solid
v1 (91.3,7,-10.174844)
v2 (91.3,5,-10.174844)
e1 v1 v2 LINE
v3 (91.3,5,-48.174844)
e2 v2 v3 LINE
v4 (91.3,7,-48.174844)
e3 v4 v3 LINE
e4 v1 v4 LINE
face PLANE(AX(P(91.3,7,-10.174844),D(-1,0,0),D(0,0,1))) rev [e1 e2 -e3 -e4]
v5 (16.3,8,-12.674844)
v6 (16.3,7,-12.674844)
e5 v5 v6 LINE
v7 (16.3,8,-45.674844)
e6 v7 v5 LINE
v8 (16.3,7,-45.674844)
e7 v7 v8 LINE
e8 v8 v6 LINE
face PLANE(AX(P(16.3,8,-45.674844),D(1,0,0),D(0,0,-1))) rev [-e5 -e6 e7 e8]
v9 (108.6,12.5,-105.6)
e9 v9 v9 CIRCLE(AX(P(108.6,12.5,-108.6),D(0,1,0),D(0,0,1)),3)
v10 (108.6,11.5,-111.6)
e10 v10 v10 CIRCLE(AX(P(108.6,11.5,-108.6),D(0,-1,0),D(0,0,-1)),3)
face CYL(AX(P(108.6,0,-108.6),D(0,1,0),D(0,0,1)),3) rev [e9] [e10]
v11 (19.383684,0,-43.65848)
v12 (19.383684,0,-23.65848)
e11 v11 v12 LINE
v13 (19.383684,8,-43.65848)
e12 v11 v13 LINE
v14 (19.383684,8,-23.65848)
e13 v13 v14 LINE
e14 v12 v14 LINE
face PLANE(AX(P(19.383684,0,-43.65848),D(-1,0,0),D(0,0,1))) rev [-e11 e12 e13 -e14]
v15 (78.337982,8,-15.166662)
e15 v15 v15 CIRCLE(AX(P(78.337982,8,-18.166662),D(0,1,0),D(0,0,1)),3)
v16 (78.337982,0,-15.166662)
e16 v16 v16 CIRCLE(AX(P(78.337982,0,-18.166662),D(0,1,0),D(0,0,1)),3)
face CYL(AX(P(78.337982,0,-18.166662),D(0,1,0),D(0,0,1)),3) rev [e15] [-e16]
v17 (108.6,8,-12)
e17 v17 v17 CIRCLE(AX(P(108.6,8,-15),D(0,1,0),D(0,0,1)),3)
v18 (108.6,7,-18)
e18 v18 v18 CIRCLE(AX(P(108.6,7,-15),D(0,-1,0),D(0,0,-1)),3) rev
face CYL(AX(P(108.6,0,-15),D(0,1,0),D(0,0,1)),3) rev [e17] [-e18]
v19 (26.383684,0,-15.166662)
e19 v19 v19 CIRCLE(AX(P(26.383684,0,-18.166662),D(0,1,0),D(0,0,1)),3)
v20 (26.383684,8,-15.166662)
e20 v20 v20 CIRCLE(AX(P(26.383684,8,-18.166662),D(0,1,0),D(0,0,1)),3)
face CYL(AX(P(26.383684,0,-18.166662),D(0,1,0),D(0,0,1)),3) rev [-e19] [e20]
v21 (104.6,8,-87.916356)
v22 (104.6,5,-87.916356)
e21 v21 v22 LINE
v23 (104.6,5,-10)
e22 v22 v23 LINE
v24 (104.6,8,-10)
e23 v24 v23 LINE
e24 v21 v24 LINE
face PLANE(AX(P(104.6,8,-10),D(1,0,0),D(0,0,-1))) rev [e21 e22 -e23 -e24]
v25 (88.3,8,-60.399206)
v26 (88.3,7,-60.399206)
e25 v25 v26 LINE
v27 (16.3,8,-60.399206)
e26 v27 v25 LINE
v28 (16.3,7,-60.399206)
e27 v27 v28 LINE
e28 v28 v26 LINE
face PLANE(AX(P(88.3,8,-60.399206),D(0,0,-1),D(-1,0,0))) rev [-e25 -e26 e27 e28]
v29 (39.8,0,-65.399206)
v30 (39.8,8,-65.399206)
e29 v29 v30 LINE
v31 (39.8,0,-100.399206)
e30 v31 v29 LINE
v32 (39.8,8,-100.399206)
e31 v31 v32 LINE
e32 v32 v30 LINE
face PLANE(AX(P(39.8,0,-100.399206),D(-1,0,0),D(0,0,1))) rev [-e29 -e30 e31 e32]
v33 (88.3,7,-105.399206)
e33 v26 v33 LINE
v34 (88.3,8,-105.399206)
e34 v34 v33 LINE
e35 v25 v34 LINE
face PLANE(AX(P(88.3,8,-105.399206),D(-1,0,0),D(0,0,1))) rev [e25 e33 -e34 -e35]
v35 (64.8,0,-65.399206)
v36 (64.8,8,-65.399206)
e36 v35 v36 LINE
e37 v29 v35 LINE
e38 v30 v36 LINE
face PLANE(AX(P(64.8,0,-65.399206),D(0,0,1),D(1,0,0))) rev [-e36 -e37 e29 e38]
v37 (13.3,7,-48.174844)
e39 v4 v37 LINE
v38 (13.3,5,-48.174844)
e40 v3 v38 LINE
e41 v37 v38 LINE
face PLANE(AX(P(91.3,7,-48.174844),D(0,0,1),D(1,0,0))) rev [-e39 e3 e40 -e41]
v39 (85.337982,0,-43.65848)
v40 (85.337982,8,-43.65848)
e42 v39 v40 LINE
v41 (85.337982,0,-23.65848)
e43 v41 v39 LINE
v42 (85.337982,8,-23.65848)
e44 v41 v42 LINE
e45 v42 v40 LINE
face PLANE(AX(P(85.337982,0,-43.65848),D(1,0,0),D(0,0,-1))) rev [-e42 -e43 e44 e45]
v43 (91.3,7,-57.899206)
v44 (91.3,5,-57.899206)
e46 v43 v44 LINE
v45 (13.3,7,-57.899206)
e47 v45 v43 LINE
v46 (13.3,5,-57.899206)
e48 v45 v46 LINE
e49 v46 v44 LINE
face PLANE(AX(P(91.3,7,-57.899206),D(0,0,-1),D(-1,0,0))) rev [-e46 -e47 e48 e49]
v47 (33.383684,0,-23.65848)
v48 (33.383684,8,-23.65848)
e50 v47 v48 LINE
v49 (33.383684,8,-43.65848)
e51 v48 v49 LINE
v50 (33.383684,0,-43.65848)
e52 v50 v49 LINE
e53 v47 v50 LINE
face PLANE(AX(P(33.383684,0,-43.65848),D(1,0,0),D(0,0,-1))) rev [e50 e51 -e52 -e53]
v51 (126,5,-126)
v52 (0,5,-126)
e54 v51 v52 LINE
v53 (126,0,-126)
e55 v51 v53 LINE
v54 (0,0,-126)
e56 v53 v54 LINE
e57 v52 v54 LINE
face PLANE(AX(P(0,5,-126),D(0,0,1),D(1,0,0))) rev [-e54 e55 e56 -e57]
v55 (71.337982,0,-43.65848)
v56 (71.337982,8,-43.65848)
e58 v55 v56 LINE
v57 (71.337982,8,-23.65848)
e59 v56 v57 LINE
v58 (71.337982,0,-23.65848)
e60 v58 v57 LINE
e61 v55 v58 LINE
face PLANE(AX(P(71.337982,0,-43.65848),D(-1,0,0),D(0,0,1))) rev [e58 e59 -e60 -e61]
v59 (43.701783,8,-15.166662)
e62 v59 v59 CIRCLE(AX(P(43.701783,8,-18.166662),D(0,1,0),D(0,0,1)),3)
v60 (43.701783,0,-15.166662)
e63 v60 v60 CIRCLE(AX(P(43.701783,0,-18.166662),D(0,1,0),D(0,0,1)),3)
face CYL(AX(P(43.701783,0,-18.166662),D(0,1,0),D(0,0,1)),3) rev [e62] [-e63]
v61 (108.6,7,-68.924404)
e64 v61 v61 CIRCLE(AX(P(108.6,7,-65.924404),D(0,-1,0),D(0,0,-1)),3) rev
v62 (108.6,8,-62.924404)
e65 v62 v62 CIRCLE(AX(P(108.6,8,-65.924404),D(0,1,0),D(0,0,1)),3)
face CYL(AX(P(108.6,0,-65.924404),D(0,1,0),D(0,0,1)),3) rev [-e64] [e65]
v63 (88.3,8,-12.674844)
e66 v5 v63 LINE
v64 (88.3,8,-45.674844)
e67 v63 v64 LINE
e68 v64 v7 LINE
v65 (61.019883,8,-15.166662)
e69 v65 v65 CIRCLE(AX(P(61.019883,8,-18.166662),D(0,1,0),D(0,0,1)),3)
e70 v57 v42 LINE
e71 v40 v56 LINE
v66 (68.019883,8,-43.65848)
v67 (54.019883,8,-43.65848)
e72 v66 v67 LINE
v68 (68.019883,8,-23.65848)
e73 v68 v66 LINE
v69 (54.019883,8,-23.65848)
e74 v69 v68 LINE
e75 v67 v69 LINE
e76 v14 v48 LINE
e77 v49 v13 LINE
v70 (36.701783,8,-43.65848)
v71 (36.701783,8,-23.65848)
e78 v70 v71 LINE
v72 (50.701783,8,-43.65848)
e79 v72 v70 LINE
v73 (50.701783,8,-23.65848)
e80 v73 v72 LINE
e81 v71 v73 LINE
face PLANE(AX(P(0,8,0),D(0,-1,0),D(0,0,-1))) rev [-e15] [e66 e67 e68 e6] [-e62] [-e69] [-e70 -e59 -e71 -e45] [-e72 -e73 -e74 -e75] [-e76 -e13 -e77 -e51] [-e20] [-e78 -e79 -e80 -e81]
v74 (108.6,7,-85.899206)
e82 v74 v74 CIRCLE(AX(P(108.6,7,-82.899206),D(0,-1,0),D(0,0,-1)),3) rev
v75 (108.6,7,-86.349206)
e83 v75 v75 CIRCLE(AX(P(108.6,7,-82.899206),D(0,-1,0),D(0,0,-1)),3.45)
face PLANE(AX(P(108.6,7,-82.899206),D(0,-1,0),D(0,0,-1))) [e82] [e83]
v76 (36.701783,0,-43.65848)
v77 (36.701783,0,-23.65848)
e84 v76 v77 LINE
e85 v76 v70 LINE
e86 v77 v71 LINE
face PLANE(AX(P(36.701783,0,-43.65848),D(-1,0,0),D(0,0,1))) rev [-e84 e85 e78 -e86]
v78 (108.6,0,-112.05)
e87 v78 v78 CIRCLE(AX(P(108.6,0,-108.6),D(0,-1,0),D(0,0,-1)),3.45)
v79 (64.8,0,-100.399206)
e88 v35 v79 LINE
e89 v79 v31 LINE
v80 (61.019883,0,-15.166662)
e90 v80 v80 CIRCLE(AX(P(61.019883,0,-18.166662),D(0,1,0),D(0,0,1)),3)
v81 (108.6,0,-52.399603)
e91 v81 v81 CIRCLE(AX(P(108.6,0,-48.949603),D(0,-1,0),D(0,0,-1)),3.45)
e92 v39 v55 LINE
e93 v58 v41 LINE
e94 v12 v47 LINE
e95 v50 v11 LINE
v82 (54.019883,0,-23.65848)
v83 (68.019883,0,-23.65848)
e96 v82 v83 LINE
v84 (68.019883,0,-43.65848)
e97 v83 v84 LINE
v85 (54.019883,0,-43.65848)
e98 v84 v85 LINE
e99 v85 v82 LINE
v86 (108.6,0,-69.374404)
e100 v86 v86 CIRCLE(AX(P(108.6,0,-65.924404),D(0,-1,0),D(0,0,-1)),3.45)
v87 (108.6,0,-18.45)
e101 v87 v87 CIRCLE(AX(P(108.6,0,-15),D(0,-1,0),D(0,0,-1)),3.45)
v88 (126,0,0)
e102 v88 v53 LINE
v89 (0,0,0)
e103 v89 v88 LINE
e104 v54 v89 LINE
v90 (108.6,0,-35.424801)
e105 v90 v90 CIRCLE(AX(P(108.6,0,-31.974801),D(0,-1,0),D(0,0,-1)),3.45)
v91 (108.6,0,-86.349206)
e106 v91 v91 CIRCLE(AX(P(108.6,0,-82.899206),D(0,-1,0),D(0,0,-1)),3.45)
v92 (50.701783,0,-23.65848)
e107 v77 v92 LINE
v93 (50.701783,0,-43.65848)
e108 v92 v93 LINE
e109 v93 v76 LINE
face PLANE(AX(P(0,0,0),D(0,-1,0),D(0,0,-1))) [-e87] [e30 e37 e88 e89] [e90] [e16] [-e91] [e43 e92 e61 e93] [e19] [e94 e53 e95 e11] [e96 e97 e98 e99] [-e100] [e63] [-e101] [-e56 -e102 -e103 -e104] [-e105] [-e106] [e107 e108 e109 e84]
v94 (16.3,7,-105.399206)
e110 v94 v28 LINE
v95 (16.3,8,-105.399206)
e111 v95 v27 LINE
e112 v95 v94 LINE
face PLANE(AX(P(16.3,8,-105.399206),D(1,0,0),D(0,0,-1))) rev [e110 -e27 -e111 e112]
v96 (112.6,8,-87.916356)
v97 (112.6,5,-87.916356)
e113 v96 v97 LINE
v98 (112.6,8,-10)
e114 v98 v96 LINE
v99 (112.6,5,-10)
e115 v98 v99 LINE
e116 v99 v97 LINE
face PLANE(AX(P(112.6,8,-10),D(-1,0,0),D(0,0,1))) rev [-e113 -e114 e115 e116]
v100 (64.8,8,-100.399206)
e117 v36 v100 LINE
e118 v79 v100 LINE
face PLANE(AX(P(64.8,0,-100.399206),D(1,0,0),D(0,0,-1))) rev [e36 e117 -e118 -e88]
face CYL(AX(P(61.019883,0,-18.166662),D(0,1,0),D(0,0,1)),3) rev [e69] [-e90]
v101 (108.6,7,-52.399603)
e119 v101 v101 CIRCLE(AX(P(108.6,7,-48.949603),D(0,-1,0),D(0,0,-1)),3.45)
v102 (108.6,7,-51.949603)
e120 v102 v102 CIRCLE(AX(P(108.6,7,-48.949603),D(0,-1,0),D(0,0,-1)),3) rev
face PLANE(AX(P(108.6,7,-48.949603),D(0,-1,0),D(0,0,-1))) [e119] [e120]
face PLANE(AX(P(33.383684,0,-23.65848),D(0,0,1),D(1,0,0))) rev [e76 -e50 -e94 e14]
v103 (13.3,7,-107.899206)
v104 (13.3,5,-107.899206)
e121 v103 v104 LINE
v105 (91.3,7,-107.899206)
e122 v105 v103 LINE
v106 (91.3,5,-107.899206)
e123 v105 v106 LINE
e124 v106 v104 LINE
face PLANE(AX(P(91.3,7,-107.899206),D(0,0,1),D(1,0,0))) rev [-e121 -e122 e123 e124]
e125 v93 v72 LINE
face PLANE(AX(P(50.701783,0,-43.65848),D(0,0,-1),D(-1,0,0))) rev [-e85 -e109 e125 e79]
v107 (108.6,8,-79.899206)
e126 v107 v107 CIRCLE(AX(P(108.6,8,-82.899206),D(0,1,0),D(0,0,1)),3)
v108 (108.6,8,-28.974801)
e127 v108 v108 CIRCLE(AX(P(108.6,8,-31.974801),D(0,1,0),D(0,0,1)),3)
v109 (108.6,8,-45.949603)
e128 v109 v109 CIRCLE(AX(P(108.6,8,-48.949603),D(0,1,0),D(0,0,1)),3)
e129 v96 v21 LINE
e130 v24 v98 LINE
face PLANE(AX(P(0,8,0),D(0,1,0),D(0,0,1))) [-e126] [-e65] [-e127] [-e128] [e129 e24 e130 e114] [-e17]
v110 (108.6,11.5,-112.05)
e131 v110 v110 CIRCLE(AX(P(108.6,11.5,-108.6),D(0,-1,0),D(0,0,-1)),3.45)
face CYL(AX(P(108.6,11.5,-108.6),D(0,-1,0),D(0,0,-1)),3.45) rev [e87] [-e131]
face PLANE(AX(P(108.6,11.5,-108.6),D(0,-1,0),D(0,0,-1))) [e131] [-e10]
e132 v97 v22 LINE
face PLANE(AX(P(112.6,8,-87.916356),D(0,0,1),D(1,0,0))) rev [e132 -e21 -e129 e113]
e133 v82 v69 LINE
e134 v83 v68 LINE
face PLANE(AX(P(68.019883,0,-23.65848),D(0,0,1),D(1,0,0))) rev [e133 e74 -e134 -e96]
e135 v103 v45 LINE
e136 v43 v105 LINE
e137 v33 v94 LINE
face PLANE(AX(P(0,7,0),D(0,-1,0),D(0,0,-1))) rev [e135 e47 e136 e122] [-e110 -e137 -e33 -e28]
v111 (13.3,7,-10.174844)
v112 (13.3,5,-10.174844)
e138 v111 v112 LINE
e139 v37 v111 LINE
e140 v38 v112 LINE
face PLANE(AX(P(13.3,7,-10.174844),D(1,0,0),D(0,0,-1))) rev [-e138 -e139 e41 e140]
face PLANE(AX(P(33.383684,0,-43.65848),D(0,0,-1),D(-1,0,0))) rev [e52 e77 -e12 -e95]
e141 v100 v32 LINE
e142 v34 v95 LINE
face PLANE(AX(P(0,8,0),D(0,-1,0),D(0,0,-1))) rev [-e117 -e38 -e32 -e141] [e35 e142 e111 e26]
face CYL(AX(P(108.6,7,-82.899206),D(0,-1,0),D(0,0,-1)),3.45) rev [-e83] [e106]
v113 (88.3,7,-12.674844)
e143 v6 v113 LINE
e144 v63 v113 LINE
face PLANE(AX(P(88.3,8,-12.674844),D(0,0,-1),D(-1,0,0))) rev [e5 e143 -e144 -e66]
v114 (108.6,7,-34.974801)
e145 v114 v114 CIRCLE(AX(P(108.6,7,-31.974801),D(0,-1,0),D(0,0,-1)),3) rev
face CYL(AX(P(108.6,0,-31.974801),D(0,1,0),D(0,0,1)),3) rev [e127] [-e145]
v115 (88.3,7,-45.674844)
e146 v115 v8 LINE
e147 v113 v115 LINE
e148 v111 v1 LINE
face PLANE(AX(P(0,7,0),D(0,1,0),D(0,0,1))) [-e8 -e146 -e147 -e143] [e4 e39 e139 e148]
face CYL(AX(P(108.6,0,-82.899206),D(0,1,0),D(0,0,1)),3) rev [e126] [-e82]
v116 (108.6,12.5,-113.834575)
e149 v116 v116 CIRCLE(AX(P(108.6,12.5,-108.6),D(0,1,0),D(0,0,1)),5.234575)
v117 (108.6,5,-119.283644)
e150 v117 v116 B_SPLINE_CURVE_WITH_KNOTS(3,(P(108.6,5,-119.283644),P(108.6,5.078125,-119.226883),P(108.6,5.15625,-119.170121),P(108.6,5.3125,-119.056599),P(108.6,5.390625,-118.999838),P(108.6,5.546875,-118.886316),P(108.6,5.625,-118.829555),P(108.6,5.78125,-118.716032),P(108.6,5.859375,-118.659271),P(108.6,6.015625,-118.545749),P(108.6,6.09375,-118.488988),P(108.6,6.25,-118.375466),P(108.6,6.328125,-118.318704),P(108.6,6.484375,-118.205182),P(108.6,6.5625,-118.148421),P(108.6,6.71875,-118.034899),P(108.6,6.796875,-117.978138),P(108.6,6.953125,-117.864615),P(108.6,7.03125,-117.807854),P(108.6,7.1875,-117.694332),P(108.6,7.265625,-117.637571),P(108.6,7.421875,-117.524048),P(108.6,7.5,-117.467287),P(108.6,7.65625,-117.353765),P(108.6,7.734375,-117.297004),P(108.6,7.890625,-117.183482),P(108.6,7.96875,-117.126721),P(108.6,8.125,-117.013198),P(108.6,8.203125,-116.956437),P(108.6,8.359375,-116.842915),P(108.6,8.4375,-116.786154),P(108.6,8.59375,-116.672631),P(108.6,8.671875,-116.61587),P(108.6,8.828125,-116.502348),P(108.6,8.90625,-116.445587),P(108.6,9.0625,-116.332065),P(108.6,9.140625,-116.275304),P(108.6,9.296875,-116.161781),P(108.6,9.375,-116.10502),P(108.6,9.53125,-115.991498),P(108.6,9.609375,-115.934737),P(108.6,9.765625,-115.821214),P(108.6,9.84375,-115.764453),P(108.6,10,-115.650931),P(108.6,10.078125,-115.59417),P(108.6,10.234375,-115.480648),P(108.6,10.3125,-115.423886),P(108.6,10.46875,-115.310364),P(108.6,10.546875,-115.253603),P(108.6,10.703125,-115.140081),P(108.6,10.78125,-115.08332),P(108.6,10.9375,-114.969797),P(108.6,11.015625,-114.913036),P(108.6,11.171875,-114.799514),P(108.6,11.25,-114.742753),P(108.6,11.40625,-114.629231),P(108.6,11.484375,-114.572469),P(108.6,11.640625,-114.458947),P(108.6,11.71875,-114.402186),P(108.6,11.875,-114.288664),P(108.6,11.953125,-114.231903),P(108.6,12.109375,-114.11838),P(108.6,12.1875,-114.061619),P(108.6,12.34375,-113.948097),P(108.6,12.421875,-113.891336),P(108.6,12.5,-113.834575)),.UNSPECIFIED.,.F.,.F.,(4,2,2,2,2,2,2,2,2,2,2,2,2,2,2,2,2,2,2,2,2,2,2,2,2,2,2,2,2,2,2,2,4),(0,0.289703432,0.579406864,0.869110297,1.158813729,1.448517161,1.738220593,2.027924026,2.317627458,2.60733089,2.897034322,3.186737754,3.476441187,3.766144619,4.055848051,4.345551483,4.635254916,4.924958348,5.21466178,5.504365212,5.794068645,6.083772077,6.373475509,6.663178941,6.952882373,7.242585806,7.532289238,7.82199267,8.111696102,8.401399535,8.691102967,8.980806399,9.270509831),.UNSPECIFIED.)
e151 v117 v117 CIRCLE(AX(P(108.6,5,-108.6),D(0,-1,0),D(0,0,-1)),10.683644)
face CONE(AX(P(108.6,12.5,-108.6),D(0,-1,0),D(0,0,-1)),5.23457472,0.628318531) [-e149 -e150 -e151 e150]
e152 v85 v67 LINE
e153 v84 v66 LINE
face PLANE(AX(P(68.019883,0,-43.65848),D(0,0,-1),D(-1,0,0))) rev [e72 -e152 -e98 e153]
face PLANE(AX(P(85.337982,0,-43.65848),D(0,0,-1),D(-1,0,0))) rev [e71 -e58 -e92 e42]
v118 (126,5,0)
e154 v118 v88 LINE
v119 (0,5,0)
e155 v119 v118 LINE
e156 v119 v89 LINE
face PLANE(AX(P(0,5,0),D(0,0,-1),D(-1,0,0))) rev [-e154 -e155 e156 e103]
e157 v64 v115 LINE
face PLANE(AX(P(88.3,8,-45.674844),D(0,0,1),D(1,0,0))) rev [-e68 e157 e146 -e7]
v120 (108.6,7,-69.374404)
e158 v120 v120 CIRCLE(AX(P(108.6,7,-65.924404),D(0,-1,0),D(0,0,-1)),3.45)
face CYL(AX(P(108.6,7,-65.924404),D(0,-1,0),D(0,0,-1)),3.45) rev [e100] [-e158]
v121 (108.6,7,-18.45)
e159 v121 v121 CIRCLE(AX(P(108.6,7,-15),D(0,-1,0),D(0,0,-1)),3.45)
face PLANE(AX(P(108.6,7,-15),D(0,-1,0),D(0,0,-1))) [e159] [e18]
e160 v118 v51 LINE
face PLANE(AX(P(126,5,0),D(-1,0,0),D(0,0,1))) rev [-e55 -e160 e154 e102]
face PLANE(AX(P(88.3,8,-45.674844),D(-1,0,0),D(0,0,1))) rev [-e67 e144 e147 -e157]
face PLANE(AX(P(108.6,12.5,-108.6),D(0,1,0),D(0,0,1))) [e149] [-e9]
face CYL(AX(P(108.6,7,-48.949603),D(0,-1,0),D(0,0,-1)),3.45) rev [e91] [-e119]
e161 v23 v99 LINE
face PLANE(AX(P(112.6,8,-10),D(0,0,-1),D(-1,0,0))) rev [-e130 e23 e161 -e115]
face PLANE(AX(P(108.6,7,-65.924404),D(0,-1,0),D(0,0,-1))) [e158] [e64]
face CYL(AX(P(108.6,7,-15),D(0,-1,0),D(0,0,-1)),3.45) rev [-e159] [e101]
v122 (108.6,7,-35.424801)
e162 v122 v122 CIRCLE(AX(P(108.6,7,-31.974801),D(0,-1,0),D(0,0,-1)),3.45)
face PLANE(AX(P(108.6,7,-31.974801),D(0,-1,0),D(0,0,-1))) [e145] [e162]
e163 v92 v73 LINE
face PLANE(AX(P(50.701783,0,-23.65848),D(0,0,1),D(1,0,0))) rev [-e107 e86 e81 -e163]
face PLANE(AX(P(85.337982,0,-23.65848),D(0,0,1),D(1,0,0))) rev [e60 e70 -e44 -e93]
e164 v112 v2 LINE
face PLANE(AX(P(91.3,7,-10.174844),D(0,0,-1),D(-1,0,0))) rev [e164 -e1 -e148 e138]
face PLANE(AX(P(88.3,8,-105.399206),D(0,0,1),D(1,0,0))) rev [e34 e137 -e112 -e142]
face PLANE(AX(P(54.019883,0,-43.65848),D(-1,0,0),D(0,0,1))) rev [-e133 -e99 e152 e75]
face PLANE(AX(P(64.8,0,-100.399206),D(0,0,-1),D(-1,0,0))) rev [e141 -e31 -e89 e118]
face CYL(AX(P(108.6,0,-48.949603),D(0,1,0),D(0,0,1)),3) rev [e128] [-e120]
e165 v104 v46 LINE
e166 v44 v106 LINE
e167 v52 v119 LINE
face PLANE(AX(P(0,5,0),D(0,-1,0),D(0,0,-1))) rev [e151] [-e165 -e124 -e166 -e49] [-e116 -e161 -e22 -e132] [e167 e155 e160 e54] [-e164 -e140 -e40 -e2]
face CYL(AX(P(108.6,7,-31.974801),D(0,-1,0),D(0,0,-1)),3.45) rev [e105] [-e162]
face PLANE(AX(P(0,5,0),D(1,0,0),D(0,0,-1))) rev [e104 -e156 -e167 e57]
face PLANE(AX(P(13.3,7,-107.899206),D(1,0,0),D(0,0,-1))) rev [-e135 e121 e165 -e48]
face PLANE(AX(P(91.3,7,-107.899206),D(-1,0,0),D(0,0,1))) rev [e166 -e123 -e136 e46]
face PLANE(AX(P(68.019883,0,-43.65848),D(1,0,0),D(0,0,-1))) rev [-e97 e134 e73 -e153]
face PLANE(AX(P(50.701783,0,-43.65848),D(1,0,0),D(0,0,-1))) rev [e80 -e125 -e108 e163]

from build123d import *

# Parameters (mm, degrees)
SKETCH1_W           = 126
SKETCH1_H           = 126
BOSS_EXTRUDE1_DEPTH = 5
SKETCH3_R           = 12.5
BOSS_EXTRUDE2_DEPTH = 7.5
SKETCH4_R           = 3.45
CUT_EXTRUDE1_DEPTH  = 11.5
SKETCH6_R           = 3
CUT_EXTRUDE2_DEPTH  = 179.628805068
CHAMFER1_SIZE       = 10
CHAMFER1_SIZE_2     = 7.26542528
SKETCH7_W           = 8
SKETCH7_H           = 77.91635632
BOSS_EXTRUDE3_DEPTH = 3
SKETCH8_R           = 3
CUT_EXTRUDE3_DEPTH  = 179.370401132
SKETCH9_R           = 3.45
CUT_EXTRUDE4_DEPTH  = 7
SKETCH12_W          = 78
SKETCH12_H          = 50
SKETCH12_H_2        = 38
BOSS_EXTRUDE4_DEPTH = 2
SKETCH13_W          = 72
SKETCH13_H          = 45
BOSS_EXTRUDE5_DEPTH = 1
SKETCH14_W          = 72
SKETCH14_H          = 33
BOSS_EXTRUDE6_DEPTH = 1
SKETCH17_W          = 25
SKETCH17_H          = 35
CUT_EXTRUDE6_DEPTH  = 179.370401132
SKETCH18_W          = 14
SKETCH18_H          = 20
CUT_EXTRUDE7_DEPTH  = 179.370401132
SKETCH19_R          = 3
CUT_EXTRUDE8_DEPTH  = 179.370401132


with BuildPart() as part:
    # Sketch1 → Boss-Extrude1 (new body)
    with BuildSketch(Plane(origin=(0, 0, 0), x_dir=(1, 0, 0), z_dir=(0, 1, 0))):
        with Locations((63, 63)):
            Rectangle(SKETCH1_W, SKETCH1_H)
    extrude(amount=BOSS_EXTRUDE1_DEPTH)

    # Sketch3 → Boss-Extrude2 (add)
    with BuildSketch(Plane(origin=(0, 5, 0), x_dir=(1, 0, 0), z_dir=(0, 1, 0))):
        with Locations(Location((108.6, 108.6, 0), (0, 0, 90))):
            Circle(SKETCH3_R)
    extrude(amount=BOSS_EXTRUDE2_DEPTH)

    # Sketch4 → Cut-Extrude1 (cut)
    with BuildSketch(Plane.XZ):
        with Locations(Location((108.6, -108.6, 0), (0, 0, 270))):
            Circle(SKETCH4_R)
    extrude(amount=-CUT_EXTRUDE1_DEPTH, mode=Mode.SUBTRACT)

    # Sketch6 → Cut-Extrude2 (cut, through all)
    with BuildSketch(Plane(origin=(0, 12.5, 0), x_dir=(1, 0, 0), z_dir=(0, 1, 0))):
        with Locations(Location((108.6, 108.6, 0), (0, 0, 270))):
            Circle(SKETCH6_R)
    extrude(amount=-CUT_EXTRUDE2_DEPTH, mode=Mode.SUBTRACT)

    # Chamfer1
    # the kernel refuses this chamfer: 10, 7.26542528 mm, written as the material it takes off along each edge
    with BuildSketch(Plane(origin=(108.6, 12.5, -108.6), x_dir=(0, 0, -1), z_dir=(1, 0, 0))) as chamfer1_piece_1_section:
        Polygon((12.5, -CHAMFER1_SIZE), (12.5 - CHAMFER1_SIZE_2, 0), (12.5, 0), align=None)
    chamfer1_piece_1 = revolve(axis=Axis((108.6, 12.5, -108.6), (0, 1, 0)), mode=Mode.PRIVATE)
    chamfer1_piece_1 = split(chamfer1_piece_1, bisect_by=Plane(origin=(108.6, 5, -100.650989912), z_dir=(0, 1, 0)), keep=Keep.TOP, mode=Mode.PRIVATE)
    add(chamfer1_piece_1, mode=Mode.SUBTRACT)

    # Sketch7 → Boss-Extrude3 (add)
    with BuildSketch(Plane(origin=(0, 5, 0), x_dir=(1, 0, 0), z_dir=(0, 1, 0))):
        with Locations((108.6, 48.95817816)):
            Rectangle(SKETCH7_W, SKETCH7_H)
    extrude(amount=BOSS_EXTRUDE3_DEPTH)

    # Sketch8 → Cut-Extrude3 (cut, through all)
    with BuildSketch(Plane(origin=(0, 8, 0), x_dir=(1, 0, 0), z_dir=(0, 1, 0))):
        with Locations(Location((108.6, 15, 0), (0, 0, 270))):
            Circle(SKETCH8_R)
        with Locations(Location((108.6, 31.974801407, 0), (0, 0, 270))):
            Circle(SKETCH8_R)
        with Locations(Location((108.6, 48.949602814, 0), (0, 0, 270))):
            Circle(SKETCH8_R)
        with Locations(Location((108.6, 65.924404221, 0), (0, 0, 270))):
            Circle(SKETCH8_R)
        with Locations(Location((108.6, 82.899205628, 0), (0, 0, 270))):
            Circle(SKETCH8_R)
    extrude(amount=-CUT_EXTRUDE3_DEPTH, mode=Mode.SUBTRACT)

    # Sketch9 → Cut-Extrude4 (cut)
    with BuildSketch(Plane.XZ):
        with Locations(Location((108.6, -82.899205628, 0), (0, 0, 270))):
            Circle(SKETCH9_R)
        with Locations(Location((108.6, -65.924404221, 0), (0, 0, 270))):
            Circle(SKETCH9_R)
        with Locations(Location((108.6, -48.949602814, 0), (0, 0, 270))):
            Circle(SKETCH9_R)
        with Locations(Location((108.6, -15, 0), (0, 0, 270))):
            Circle(SKETCH9_R)
        with Locations(Location((108.6, -31.974801407, 0), (0, 0, 270))):
            Circle(SKETCH9_R)
    extrude(amount=-CUT_EXTRUDE4_DEPTH, mode=Mode.SUBTRACT)

    # Sketch12 → Boss-Extrude4 (add)
    with BuildSketch(Plane(origin=(0, 5, 0), x_dir=(1, 0, 0), z_dir=(0, 1, 0))):
        with Locations((52.3, 82.899205628)):
            Rectangle(SKETCH12_W, SKETCH12_H)
        with Locations((52.3, 29.174843528)):
            Rectangle(SKETCH12_W, SKETCH12_H_2)
    extrude(amount=BOSS_EXTRUDE4_DEPTH)

    # Sketch13 → Boss-Extrude5 (add)
    with BuildSketch(Plane(origin=(0, 7, 0), x_dir=(1, 0, 0), z_dir=(0, 1, 0))):
        with Locations((52.3, 82.899205628)):
            Rectangle(SKETCH13_W, SKETCH13_H)
    extrude(amount=BOSS_EXTRUDE5_DEPTH)

    # Sketch14 → Boss-Extrude6 (add)
    with BuildSketch(Plane(origin=(0, 7, 0), x_dir=(1, 0, 0), z_dir=(0, 1, 0))):
        with Locations((52.3, 29.174843528)):
            Rectangle(SKETCH14_W, SKETCH14_H)
    extrude(amount=BOSS_EXTRUDE6_DEPTH)

    # Sketch17 → Cut-Extrude6 (cut, through all)
    with BuildSketch(Plane(origin=(0, 8, 0), x_dir=(1, 0, 0), z_dir=(0, 1, 0))):
        with Locations((52.3, 82.899205628)):
            Rectangle(SKETCH17_W, SKETCH17_H)
    extrude(amount=-CUT_EXTRUDE6_DEPTH, mode=Mode.SUBTRACT)

    # Sketch18 → Cut-Extrude7 (cut, through all)
    with BuildSketch(Plane(origin=(0, 8, 0), x_dir=(1, 0, 0), z_dir=(0, 1, 0))):
        with Locations((43.701783173, 33.658480439)):
            Rectangle(SKETCH18_W, SKETCH18_H)
        with Locations((61.019882804, 33.658480439)):
            Rectangle(SKETCH18_W, SKETCH18_H)
        with Locations((78.337982434, 33.658480439)):
            Rectangle(SKETCH18_W, SKETCH18_H)
        with Locations((26.383683543, 33.658480439)):
            Rectangle(SKETCH18_W, SKETCH18_H)
    extrude(amount=-CUT_EXTRUDE7_DEPTH, mode=Mode.SUBTRACT)

    # Sketch19 → Cut-Extrude8 (cut, through all)
    with BuildSketch(Plane(origin=(0, 8, 0), x_dir=(1, 0, 0), z_dir=(0, 1, 0))):
        with Locations(Location((26.383683543, 18.166661984, 0), (0, 0, 270))):
            Circle(SKETCH19_R)
        with Locations(Location((43.701783173, 18.166661984, 0), (0, 0, 270))):
            Circle(SKETCH19_R)
        with Locations(Location((61.019882804, 18.166661984, 0), (0, 0, 270))):
            Circle(SKETCH19_R)
        with Locations(Location((78.337982434, 18.166661984, 0), (0, 0, 270))):
            Circle(SKETCH19_R)
    extrude(amount=-CUT_EXTRUDE8_DEPTH, mode=Mode.SUBTRACT)


solid = part.part
